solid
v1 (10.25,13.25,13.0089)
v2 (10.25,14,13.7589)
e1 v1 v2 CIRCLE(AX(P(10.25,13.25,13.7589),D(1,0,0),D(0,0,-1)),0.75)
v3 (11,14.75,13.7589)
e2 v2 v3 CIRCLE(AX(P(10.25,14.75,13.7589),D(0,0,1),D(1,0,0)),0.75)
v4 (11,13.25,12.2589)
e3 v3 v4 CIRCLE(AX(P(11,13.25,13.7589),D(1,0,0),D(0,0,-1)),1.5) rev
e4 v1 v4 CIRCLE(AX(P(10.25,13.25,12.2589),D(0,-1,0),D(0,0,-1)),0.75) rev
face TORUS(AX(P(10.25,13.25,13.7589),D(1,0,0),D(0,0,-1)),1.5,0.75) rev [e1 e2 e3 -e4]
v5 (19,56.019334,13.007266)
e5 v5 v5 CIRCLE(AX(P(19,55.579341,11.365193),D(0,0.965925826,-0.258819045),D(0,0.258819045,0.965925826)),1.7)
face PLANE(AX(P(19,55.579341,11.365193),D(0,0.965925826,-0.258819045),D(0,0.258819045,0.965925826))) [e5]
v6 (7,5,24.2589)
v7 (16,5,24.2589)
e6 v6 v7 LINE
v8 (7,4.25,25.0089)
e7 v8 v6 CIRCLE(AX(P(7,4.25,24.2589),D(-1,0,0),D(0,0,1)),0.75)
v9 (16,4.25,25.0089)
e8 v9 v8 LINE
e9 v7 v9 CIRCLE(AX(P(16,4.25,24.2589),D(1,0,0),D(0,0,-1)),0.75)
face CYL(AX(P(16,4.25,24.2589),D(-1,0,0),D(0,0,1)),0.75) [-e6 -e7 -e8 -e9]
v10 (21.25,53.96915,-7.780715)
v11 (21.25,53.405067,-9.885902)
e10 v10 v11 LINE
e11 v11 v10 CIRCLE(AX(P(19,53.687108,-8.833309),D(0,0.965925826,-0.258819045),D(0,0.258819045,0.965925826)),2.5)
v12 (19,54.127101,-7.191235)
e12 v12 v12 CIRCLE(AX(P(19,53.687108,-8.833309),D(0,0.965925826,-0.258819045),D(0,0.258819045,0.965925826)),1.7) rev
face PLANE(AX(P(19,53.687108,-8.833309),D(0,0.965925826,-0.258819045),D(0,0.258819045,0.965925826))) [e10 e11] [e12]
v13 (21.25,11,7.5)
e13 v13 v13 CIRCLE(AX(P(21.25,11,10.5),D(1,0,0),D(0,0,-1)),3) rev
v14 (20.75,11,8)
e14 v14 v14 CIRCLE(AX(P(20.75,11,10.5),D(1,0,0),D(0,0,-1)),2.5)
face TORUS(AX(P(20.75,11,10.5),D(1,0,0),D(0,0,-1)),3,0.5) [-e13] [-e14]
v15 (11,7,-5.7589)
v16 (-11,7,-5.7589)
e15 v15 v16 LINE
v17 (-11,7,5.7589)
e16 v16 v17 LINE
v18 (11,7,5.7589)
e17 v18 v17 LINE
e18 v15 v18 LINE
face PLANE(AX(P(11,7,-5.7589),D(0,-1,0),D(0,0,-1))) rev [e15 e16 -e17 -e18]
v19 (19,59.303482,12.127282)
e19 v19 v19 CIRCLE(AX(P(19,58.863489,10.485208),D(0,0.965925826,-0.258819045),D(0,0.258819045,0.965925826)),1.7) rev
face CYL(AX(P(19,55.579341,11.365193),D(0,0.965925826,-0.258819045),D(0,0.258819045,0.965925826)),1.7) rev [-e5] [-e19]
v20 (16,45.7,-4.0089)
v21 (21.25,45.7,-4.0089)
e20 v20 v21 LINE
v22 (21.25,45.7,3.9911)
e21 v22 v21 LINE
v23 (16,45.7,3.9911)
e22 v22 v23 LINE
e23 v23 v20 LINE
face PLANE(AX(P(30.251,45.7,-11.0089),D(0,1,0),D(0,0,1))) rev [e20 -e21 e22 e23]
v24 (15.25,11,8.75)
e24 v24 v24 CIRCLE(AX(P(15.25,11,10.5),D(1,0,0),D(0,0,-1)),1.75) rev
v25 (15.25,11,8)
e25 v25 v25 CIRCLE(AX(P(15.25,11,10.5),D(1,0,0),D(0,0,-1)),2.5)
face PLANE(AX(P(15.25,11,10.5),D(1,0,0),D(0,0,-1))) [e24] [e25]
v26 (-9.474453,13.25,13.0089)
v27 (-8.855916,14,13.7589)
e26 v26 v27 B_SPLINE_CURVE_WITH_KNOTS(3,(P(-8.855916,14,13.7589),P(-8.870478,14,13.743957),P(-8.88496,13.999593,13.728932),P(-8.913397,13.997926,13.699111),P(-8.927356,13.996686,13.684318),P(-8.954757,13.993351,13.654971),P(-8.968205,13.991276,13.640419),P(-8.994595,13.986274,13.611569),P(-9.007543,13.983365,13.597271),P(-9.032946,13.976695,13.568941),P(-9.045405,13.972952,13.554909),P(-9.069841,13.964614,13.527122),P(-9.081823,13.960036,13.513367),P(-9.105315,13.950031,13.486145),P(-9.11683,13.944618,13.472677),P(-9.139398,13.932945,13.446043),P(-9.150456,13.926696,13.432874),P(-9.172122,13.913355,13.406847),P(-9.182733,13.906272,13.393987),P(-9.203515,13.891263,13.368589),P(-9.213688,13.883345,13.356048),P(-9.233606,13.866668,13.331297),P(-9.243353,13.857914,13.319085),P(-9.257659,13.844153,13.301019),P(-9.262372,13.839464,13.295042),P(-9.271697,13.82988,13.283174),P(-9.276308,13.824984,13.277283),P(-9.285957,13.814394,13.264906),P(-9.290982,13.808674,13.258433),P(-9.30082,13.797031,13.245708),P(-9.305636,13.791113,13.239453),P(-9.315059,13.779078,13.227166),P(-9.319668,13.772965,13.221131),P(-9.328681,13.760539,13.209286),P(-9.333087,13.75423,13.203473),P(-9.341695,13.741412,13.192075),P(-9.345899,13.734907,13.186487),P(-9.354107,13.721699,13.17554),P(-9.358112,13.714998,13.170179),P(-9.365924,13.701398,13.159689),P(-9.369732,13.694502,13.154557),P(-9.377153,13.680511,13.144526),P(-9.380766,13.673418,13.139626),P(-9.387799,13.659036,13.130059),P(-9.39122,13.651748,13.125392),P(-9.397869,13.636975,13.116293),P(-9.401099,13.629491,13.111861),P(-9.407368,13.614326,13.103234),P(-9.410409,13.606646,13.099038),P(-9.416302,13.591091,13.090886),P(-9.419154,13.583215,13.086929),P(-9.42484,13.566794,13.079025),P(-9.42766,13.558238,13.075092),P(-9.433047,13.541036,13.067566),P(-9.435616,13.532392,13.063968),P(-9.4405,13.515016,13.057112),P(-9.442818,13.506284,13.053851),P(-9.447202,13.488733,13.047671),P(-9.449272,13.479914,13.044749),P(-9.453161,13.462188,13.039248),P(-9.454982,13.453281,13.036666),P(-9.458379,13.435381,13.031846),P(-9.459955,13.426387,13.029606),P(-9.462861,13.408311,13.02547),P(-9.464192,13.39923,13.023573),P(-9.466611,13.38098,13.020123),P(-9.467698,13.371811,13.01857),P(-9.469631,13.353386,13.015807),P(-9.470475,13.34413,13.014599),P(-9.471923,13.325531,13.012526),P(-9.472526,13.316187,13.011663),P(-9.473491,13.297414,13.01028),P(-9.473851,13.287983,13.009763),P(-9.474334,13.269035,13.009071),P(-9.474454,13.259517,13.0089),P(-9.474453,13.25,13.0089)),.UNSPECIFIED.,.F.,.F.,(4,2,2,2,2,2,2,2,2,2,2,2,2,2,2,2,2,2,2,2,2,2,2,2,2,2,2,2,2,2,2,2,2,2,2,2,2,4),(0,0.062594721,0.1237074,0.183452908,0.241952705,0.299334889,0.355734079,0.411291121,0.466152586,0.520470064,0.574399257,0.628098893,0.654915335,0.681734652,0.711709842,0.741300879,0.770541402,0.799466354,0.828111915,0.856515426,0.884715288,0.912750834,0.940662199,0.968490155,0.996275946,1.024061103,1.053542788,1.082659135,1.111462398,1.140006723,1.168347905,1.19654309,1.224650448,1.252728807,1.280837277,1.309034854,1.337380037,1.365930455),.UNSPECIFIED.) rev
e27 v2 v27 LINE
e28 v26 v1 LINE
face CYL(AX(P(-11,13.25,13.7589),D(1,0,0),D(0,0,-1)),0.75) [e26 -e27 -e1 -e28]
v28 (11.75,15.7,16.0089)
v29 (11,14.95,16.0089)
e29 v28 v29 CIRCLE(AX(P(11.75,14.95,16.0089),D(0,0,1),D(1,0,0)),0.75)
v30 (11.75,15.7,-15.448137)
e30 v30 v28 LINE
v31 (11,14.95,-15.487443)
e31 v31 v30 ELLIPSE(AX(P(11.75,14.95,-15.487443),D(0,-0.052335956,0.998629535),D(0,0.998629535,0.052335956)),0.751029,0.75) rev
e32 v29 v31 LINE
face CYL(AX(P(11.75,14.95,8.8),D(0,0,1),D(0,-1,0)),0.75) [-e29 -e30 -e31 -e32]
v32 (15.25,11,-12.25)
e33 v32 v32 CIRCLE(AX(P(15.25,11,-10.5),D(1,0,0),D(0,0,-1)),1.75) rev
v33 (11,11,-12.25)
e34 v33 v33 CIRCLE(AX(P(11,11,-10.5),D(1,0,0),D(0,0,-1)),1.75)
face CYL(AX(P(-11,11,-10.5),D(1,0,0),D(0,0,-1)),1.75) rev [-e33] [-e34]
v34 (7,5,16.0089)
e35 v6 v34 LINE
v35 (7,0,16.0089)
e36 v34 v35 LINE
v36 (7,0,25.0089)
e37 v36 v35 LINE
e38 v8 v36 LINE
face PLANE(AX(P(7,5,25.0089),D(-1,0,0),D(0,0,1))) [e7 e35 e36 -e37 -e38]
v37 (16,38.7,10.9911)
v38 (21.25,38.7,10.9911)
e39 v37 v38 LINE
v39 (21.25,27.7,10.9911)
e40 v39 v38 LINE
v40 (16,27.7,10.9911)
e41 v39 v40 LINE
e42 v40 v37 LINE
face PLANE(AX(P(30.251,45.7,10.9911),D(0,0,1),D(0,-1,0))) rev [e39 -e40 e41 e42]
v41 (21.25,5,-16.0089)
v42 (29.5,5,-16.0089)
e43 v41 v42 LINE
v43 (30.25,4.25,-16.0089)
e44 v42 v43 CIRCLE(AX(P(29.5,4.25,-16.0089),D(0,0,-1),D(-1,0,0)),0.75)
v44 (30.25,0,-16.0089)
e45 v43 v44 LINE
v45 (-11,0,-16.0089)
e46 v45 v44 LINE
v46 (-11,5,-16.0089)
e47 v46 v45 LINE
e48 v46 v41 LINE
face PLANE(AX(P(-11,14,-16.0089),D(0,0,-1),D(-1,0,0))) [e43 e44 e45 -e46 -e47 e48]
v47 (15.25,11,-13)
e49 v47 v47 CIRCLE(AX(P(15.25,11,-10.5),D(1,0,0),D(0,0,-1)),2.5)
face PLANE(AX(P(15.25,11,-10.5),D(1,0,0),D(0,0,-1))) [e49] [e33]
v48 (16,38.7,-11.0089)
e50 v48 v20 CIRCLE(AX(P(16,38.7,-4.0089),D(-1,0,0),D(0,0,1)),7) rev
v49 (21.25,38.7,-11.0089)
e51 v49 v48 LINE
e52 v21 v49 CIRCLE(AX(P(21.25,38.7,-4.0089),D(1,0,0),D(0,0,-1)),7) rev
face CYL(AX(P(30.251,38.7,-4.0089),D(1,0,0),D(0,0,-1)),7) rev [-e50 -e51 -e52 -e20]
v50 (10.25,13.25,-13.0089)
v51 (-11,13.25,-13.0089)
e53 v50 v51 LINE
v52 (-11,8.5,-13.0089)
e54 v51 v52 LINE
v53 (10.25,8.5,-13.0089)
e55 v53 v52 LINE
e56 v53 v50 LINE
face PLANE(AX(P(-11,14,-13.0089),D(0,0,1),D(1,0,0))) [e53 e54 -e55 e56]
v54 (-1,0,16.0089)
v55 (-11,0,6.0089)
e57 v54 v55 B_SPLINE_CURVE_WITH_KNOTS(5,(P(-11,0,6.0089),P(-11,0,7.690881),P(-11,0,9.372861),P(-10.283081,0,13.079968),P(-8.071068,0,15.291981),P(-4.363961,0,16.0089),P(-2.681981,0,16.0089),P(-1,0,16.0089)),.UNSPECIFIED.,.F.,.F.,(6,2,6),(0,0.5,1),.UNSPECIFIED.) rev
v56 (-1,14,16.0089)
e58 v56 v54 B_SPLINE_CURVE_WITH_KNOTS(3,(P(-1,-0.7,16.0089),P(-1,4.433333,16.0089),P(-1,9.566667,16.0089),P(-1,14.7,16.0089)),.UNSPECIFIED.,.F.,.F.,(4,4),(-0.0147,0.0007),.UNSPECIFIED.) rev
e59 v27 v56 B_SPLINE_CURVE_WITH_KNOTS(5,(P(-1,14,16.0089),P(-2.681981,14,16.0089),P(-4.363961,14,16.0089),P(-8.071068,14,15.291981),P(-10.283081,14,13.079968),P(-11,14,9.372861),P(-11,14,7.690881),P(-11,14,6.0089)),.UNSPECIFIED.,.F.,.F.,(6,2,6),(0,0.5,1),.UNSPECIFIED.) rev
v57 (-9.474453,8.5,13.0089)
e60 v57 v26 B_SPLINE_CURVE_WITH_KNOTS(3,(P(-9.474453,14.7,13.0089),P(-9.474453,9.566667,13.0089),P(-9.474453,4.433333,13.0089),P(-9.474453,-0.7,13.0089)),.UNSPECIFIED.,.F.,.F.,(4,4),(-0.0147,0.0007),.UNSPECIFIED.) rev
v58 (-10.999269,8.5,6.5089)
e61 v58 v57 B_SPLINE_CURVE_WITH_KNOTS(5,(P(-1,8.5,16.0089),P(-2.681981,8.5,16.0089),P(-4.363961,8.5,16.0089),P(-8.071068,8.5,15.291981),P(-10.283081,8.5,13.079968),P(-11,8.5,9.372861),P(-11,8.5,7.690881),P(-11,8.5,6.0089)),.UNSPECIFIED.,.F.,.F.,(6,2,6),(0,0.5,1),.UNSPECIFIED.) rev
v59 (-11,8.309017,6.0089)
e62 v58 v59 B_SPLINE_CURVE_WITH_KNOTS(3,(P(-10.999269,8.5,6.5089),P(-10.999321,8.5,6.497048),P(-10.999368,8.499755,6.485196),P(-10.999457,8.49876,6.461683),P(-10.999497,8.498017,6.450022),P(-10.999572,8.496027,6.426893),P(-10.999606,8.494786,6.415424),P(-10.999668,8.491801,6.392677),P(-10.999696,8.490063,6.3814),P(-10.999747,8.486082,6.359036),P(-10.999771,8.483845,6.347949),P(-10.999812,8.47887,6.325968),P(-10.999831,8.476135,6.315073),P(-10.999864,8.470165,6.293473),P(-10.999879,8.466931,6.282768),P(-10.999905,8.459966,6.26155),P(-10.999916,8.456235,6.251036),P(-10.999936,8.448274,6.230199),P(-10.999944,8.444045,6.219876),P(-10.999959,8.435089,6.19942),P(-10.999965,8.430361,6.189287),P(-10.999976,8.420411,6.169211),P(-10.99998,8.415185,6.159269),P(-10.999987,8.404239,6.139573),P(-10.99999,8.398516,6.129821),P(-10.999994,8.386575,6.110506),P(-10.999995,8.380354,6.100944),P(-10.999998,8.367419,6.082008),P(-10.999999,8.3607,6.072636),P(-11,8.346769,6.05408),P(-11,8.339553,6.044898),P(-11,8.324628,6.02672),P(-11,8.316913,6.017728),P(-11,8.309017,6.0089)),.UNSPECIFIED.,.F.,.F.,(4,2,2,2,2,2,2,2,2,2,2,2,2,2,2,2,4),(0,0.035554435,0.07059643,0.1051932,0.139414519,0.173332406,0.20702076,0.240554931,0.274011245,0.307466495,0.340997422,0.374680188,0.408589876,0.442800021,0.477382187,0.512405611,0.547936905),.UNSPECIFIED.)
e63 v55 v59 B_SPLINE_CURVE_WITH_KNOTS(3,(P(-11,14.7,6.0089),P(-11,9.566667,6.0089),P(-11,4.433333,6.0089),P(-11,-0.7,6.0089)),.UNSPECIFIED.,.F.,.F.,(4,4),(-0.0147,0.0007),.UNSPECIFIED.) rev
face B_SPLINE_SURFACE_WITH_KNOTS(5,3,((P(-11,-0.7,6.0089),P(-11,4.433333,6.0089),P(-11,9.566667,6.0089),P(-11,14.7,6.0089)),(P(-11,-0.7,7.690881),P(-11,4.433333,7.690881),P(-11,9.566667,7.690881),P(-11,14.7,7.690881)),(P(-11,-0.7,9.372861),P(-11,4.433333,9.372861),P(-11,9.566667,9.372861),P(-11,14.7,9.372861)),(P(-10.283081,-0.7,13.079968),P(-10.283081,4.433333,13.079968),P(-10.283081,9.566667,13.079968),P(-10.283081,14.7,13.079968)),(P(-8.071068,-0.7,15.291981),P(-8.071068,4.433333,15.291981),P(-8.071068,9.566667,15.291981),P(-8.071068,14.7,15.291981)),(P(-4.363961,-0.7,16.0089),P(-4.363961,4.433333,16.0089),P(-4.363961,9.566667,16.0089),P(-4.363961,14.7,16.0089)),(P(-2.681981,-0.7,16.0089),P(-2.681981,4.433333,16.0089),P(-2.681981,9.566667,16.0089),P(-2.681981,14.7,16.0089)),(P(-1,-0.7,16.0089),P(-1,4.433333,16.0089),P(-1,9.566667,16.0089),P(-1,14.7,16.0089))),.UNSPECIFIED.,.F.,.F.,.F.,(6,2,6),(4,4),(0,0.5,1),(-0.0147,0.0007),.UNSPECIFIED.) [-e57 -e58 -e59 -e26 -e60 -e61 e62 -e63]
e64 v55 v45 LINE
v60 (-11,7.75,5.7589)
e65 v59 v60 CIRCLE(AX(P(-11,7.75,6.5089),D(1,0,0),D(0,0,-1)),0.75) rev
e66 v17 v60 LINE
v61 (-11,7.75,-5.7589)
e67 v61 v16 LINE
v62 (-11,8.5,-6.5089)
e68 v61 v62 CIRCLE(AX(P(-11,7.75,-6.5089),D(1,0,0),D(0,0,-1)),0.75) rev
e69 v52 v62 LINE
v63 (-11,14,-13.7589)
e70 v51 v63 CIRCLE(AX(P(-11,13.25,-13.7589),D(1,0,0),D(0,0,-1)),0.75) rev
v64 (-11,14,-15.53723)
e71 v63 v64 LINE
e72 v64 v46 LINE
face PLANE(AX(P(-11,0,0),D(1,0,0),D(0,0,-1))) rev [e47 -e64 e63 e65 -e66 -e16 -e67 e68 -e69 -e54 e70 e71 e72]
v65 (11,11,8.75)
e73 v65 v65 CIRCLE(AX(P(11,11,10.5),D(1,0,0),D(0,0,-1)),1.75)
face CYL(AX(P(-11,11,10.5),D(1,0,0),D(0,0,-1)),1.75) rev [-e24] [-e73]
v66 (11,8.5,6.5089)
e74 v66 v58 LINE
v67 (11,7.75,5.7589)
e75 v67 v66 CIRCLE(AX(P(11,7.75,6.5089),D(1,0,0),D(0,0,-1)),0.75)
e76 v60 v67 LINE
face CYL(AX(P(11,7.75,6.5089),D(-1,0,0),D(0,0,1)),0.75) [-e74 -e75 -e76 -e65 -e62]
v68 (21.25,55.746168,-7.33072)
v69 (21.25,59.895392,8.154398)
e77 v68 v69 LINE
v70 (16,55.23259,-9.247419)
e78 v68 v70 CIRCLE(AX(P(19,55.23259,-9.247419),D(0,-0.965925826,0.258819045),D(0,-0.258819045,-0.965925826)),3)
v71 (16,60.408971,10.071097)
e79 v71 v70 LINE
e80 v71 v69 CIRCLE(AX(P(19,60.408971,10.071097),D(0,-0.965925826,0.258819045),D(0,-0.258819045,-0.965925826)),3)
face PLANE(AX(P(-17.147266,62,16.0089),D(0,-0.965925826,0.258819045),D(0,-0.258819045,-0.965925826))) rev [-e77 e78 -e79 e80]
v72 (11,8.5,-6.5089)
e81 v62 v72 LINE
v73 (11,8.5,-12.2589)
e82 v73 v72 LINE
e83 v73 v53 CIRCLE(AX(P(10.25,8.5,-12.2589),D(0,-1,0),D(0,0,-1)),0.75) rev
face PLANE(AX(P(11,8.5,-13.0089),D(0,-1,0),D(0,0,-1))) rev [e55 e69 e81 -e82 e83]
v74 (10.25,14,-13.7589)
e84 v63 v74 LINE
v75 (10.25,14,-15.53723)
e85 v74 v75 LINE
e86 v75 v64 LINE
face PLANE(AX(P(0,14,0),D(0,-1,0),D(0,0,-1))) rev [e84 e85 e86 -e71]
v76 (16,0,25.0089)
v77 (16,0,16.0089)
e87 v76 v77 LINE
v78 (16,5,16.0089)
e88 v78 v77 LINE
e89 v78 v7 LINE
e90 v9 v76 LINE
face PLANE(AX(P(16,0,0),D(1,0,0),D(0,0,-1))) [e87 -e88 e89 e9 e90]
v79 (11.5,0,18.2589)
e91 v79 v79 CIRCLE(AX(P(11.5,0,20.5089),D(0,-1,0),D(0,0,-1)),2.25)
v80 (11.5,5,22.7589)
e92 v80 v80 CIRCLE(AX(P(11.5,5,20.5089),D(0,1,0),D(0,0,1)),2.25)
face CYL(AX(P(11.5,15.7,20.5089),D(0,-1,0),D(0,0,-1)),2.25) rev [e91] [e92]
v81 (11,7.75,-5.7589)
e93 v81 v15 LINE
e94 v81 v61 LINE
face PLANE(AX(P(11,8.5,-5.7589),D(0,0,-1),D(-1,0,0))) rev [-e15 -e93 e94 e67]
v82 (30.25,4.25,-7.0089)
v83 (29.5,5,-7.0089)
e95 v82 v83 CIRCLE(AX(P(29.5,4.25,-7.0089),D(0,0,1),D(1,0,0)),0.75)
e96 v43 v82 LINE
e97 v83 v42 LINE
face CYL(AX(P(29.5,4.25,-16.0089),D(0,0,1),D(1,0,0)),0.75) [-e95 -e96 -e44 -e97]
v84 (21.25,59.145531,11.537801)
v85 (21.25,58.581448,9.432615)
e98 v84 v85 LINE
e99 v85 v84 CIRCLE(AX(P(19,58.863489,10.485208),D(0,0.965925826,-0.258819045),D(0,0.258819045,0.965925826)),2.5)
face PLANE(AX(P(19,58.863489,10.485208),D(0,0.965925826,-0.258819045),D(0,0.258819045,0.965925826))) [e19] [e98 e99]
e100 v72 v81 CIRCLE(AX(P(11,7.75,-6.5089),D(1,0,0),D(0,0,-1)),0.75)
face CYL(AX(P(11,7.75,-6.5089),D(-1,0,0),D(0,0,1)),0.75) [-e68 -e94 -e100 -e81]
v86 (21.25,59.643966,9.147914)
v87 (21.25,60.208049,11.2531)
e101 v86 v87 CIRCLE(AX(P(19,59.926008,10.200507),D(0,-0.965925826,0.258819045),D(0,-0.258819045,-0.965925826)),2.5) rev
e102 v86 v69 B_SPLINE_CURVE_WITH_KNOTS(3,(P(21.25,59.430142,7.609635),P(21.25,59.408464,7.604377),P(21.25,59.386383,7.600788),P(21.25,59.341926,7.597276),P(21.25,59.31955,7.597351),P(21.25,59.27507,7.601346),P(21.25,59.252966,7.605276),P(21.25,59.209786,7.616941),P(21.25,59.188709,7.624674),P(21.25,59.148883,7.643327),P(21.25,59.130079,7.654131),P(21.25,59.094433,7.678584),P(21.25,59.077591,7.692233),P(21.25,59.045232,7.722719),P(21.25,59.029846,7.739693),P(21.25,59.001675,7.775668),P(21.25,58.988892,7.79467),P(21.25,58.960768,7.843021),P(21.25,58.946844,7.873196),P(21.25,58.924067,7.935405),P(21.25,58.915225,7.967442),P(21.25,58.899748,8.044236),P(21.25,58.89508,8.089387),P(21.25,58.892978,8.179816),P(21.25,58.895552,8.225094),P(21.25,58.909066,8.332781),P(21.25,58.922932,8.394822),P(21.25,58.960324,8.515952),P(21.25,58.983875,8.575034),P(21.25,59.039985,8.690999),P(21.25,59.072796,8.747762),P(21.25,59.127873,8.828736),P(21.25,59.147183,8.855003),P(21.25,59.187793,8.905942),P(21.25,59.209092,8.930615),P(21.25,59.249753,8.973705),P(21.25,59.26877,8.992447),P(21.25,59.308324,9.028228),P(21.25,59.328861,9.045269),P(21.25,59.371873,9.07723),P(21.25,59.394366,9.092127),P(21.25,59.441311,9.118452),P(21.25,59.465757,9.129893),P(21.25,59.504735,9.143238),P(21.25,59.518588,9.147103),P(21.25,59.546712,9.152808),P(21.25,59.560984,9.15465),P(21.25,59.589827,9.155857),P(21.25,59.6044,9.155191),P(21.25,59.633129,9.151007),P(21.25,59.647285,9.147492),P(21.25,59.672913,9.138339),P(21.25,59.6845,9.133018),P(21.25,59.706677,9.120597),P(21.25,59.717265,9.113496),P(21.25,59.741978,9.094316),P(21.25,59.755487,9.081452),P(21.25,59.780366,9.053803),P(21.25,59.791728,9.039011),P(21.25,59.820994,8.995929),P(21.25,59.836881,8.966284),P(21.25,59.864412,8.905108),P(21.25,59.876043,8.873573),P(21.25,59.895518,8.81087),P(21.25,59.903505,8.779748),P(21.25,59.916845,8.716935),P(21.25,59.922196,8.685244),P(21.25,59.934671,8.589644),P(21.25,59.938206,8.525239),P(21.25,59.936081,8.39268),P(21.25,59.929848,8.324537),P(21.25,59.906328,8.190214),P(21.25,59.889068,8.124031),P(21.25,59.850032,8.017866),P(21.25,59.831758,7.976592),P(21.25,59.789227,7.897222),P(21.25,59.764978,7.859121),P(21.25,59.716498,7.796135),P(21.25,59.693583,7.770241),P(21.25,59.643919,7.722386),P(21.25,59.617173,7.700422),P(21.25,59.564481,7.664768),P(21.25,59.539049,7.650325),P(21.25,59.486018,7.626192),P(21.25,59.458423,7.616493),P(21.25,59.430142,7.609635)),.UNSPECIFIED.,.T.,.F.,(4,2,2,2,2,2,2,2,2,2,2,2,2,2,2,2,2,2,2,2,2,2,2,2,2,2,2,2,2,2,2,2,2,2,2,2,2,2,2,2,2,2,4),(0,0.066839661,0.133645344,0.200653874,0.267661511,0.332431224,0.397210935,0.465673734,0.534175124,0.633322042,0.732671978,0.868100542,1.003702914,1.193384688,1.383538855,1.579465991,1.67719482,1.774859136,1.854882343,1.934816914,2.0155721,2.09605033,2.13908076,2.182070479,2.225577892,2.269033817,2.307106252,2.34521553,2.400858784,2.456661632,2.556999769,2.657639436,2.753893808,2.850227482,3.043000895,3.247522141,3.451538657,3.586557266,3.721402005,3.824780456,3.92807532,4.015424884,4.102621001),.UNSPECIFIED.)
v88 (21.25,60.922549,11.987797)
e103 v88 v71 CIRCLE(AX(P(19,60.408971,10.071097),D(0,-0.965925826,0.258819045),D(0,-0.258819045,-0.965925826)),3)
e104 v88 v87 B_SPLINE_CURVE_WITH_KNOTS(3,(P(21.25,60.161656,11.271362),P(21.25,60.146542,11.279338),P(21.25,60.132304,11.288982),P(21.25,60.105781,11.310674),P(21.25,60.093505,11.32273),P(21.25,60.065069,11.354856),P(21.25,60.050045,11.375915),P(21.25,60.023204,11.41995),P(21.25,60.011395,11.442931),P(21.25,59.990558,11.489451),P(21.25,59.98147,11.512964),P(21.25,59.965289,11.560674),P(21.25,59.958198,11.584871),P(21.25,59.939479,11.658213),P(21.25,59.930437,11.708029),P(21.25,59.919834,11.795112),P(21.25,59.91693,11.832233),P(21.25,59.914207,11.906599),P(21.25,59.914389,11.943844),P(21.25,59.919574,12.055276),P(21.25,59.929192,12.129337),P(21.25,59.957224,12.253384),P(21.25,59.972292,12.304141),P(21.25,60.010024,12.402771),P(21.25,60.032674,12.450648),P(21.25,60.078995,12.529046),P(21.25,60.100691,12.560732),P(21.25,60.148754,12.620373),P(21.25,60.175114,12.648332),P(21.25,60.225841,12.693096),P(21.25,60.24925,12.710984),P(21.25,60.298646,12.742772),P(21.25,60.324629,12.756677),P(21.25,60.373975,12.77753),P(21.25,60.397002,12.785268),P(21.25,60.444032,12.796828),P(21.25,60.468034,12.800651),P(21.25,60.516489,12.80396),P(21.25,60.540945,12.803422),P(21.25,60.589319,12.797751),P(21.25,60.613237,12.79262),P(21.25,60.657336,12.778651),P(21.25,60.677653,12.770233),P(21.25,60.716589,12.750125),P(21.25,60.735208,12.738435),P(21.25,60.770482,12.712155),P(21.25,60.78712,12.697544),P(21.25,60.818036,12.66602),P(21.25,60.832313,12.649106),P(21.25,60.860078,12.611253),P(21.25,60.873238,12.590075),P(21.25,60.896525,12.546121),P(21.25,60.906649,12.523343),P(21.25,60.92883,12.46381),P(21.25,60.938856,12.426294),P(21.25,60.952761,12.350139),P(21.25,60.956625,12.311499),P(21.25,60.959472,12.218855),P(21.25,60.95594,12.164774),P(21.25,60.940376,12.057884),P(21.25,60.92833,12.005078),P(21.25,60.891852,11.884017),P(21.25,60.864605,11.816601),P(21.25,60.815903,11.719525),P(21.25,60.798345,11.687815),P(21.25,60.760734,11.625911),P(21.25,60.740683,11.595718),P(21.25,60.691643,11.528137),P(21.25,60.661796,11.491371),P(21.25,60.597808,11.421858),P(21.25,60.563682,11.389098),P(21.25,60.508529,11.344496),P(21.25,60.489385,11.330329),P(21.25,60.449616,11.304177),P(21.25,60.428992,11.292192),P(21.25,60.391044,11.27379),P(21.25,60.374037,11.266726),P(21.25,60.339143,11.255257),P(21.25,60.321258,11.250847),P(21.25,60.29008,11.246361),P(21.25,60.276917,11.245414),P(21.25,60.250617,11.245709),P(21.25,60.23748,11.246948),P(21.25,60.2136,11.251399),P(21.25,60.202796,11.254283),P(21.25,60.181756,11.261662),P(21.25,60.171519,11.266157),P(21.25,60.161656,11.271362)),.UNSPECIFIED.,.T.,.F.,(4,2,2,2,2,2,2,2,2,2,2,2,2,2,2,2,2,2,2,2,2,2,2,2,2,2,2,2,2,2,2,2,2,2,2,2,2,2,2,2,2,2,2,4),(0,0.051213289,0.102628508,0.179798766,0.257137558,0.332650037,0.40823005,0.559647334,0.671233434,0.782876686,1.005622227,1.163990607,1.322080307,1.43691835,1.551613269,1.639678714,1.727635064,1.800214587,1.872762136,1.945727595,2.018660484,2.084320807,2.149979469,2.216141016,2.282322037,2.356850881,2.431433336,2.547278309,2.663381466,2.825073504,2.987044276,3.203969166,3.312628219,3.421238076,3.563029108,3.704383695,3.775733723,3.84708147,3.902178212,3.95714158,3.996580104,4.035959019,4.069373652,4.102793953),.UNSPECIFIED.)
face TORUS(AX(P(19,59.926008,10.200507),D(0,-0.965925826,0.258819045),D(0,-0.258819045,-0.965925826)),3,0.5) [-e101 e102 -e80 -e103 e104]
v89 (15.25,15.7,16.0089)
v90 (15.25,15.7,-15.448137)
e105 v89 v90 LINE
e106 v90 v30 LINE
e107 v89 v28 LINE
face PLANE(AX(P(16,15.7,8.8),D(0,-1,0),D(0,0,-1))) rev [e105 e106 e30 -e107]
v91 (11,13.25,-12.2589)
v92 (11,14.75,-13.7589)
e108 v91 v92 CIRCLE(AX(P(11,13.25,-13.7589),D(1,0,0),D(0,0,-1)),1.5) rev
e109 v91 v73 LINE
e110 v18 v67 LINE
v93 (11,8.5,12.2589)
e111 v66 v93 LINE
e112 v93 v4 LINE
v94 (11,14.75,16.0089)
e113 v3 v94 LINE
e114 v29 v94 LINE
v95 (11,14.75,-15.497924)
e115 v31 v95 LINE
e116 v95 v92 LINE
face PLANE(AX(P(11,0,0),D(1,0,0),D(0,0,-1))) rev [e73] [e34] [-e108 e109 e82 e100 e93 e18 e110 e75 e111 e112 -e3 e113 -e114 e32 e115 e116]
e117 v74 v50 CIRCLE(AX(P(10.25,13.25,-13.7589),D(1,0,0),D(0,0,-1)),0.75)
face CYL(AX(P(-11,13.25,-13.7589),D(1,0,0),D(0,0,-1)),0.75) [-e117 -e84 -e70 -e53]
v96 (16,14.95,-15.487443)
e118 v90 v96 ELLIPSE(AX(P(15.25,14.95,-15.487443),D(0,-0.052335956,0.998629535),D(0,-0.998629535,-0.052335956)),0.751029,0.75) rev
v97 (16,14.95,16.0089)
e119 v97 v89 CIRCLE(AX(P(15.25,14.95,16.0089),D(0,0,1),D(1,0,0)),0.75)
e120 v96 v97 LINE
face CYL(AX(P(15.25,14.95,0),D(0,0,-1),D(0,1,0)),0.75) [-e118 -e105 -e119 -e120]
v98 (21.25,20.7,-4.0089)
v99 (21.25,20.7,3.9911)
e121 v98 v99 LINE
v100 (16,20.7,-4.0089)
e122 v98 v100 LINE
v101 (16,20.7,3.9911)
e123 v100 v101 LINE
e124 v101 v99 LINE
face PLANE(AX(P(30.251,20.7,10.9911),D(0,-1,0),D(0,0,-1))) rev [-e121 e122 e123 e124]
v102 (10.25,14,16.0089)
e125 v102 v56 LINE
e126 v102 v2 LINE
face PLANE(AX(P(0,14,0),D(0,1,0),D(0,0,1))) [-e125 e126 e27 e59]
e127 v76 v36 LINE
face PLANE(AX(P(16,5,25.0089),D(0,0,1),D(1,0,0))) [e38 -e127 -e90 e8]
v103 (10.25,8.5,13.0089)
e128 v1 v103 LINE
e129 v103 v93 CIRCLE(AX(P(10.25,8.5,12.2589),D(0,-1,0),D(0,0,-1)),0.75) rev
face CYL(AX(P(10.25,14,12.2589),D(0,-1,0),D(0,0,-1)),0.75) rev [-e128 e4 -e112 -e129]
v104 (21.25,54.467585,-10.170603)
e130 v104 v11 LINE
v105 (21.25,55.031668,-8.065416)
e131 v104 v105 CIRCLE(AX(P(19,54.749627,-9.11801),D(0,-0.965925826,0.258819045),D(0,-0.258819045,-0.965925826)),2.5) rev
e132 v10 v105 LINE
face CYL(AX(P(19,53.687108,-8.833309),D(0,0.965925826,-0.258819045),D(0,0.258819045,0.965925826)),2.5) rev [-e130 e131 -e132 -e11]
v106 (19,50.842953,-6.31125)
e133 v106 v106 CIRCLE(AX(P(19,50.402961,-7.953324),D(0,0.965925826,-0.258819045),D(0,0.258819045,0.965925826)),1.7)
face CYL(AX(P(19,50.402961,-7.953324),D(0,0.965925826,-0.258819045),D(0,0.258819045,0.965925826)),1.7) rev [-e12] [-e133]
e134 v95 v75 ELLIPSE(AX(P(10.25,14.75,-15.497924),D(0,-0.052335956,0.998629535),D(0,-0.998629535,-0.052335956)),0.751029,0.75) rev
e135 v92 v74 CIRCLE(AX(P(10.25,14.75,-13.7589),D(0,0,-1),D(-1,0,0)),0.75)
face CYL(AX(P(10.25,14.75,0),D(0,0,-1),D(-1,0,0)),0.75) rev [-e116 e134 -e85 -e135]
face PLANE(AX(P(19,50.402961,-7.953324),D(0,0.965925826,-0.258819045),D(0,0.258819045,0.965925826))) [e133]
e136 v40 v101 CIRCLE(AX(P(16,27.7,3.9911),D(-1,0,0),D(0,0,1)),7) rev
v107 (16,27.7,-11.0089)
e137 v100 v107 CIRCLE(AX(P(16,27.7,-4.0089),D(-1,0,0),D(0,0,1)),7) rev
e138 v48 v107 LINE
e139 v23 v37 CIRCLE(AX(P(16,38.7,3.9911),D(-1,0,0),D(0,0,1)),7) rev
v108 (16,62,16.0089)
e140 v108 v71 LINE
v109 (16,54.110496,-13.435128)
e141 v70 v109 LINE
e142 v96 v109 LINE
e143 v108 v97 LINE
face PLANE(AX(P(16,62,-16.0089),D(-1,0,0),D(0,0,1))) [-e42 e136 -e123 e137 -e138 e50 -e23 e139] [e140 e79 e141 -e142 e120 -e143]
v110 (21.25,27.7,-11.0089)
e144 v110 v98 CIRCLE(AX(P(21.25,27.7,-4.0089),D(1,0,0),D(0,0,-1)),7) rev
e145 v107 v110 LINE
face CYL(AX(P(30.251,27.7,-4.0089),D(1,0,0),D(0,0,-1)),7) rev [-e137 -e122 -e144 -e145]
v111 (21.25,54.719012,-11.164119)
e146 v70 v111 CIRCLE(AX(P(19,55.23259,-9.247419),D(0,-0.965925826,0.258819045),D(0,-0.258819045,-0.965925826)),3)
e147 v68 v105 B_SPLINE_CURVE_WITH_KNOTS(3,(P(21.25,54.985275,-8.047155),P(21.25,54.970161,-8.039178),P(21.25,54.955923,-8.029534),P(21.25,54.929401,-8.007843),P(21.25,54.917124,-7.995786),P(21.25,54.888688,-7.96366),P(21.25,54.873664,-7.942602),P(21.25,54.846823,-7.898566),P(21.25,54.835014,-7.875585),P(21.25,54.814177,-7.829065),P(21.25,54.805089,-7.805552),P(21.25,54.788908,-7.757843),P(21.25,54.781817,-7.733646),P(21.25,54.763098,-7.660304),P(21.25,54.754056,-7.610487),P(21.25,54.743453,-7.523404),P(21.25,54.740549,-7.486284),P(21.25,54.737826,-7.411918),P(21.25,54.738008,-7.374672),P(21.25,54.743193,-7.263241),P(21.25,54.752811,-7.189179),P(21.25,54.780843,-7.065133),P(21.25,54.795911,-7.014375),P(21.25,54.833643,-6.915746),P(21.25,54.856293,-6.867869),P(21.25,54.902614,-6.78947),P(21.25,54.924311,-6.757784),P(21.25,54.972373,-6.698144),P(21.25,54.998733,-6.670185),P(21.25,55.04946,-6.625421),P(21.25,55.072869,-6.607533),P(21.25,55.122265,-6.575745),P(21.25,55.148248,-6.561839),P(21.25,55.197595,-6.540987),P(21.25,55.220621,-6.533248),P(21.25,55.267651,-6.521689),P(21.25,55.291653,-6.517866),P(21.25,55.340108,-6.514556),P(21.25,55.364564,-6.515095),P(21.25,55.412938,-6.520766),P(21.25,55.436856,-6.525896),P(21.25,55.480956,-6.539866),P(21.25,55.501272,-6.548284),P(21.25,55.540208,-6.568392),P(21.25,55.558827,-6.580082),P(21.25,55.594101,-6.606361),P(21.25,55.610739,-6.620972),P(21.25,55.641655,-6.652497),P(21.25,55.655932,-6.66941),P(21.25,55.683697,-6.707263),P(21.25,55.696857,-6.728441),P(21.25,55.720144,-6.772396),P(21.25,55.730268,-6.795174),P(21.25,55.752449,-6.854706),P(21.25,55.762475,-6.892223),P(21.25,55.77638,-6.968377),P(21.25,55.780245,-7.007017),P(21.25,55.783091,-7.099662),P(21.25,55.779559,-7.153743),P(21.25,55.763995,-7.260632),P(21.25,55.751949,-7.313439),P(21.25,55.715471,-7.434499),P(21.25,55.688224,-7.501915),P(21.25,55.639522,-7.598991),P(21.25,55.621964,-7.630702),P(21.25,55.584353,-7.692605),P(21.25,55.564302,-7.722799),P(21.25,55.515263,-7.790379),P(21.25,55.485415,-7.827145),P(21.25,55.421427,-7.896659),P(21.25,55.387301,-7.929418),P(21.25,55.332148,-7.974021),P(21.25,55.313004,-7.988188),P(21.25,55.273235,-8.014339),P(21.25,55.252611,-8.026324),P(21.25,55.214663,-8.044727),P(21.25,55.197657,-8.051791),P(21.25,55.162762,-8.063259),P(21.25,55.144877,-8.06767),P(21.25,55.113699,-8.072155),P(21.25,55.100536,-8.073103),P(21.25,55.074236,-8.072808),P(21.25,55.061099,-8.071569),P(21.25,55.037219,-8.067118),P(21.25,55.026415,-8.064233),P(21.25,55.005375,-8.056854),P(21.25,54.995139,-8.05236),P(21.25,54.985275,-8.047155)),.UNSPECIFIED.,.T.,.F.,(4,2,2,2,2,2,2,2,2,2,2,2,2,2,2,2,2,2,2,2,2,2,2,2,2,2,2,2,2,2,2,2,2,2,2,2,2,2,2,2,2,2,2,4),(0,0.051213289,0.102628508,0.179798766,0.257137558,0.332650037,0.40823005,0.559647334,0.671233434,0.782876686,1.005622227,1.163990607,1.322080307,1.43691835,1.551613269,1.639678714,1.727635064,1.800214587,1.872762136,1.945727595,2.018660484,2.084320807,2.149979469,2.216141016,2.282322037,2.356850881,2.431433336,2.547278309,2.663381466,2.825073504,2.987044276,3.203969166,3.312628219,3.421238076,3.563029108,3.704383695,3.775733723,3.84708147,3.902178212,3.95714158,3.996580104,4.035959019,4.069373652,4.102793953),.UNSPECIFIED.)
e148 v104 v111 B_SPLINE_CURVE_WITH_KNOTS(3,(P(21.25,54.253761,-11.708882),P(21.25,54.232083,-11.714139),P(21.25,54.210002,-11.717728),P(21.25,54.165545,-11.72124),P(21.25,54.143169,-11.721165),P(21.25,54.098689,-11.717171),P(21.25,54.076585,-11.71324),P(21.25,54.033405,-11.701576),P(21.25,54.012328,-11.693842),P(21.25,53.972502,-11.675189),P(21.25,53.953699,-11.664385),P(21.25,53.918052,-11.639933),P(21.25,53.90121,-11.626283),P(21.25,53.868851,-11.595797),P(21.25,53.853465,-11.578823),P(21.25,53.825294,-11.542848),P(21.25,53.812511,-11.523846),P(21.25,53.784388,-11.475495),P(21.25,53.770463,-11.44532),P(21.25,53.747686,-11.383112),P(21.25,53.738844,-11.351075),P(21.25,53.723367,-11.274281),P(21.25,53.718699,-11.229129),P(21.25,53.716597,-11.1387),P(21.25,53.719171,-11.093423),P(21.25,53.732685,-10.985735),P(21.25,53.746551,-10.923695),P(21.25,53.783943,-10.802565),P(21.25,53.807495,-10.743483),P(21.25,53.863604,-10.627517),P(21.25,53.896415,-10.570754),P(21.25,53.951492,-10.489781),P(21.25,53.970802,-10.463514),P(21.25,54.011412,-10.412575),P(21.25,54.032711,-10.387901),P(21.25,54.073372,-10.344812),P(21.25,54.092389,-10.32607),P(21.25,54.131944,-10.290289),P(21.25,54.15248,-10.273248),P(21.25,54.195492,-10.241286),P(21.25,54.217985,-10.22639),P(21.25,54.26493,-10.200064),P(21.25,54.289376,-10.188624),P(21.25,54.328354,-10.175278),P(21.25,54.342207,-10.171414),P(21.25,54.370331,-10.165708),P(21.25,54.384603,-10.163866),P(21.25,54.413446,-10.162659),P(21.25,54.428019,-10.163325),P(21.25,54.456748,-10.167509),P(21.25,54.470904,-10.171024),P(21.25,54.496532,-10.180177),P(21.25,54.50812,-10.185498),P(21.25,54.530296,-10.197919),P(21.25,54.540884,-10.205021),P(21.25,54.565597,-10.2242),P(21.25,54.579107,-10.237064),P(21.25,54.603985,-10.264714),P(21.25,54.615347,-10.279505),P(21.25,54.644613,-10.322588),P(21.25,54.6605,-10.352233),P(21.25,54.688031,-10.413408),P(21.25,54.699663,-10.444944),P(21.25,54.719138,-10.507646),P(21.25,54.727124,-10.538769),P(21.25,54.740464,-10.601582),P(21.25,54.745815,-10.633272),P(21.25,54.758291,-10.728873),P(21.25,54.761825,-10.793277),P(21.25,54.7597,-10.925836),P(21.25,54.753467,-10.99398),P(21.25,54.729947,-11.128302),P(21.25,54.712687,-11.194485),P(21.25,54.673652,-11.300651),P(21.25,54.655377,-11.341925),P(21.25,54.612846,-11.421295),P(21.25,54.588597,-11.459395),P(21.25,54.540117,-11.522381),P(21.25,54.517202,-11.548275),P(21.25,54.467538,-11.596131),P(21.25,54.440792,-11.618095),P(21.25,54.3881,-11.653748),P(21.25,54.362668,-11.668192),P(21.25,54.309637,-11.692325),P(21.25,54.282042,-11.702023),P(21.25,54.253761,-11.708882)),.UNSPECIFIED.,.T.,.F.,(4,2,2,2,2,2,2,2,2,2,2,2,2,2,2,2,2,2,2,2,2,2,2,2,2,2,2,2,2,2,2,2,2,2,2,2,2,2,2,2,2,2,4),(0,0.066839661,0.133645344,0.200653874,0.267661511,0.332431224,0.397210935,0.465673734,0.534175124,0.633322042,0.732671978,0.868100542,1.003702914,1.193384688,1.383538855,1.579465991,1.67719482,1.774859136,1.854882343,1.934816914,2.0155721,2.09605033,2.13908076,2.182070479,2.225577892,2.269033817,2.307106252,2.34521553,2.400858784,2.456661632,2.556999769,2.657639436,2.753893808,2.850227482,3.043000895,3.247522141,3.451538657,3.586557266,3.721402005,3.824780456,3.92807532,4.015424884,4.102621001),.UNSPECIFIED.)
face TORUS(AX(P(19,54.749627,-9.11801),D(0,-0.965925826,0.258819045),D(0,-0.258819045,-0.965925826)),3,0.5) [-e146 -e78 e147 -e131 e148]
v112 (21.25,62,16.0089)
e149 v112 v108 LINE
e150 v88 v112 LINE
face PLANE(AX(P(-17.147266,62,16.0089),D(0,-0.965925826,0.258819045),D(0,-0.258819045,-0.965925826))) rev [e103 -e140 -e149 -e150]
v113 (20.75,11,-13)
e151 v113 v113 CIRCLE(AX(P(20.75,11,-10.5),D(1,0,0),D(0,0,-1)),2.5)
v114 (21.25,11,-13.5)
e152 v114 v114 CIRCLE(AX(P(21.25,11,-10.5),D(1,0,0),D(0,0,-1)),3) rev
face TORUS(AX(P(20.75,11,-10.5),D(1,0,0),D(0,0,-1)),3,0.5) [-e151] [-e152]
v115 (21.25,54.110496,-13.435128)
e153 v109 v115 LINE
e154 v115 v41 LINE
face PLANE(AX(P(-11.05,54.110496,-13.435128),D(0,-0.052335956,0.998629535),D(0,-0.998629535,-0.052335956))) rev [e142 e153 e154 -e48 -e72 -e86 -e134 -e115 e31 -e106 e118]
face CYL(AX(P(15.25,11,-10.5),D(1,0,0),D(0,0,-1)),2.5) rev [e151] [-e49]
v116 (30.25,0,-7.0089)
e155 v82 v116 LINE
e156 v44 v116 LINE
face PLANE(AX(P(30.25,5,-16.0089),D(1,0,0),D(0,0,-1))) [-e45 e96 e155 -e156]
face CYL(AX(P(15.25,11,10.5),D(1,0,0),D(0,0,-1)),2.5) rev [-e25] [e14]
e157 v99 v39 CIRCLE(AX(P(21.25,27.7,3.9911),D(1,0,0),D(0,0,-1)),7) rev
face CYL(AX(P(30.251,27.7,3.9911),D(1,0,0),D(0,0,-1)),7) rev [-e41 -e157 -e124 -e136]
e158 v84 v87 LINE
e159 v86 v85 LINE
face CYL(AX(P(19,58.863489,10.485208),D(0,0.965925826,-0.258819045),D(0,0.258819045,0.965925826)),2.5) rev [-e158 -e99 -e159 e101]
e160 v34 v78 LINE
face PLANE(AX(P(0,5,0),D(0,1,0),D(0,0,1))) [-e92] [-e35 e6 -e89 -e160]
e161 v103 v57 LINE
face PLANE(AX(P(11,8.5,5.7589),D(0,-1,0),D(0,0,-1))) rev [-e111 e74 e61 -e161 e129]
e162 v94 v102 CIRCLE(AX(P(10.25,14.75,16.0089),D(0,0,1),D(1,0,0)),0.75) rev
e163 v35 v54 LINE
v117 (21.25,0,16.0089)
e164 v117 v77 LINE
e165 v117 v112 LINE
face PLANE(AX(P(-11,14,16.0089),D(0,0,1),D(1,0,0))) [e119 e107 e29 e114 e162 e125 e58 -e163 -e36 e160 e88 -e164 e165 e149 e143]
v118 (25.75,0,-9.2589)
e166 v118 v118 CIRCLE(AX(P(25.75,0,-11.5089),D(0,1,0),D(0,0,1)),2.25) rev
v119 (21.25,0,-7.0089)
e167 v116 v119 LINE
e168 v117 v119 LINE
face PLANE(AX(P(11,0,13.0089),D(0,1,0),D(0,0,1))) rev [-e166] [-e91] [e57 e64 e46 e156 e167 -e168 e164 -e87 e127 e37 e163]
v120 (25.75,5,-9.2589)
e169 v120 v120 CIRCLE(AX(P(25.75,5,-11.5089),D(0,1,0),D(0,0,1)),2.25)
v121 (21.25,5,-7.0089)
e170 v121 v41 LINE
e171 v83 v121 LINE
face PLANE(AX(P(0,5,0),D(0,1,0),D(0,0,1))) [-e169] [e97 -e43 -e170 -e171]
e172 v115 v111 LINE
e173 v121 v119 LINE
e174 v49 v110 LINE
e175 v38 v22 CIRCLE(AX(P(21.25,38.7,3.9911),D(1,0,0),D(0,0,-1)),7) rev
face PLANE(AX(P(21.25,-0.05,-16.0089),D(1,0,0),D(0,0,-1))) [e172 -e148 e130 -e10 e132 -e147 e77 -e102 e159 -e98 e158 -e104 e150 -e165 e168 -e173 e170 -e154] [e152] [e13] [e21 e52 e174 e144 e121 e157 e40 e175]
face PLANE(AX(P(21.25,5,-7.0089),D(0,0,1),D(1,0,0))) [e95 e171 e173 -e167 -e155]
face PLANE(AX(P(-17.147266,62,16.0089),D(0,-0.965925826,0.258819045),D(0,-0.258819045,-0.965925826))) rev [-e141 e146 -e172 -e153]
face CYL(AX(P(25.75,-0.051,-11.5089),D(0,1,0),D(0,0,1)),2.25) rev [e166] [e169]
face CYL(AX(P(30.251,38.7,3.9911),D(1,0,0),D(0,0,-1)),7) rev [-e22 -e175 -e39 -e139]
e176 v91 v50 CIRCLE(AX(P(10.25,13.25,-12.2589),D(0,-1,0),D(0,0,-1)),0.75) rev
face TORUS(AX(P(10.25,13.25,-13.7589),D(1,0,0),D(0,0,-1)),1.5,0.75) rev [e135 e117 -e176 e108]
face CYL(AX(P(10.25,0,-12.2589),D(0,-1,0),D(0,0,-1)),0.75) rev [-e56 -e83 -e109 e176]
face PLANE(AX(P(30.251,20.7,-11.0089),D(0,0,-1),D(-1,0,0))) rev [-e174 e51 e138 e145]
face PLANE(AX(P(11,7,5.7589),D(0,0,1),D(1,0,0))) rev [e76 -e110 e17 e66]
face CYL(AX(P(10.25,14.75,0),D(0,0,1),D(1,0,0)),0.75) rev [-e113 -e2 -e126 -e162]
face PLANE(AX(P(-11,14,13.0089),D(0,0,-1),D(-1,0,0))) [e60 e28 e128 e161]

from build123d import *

# Parameters (mm, degrees)
BOSS_EXTRUDE1_DEPTH = 11
SKETCH3_W           = 22
SKETCH3_H           = 3
BOSS_EXTRUDE2_DEPTH = 14
BOSS_EXTRUDE3_DEPTH = 5
SKETCH5_R           = 1.75
CUT_EXTRUDE1_DEPTH  = 36.096650541
SKETCH6_W           = 9
SKETCH6_H           = 9
BOSS_EXTRUDE4_DEPTH = 5
SKETCH10_R          = 2.25
CUT_EXTRUDE2_DEPTH  = 34.584744739
FILLET1_R           = 0.75
FILLET2_SIZE        = 10
SKETCH12_W          = 9
SKETCH12_H          = 32.0178
BOSS_EXTRUDE5_DEPTH = 62
CUT_EXTRUDE4_DEPTH  = 9
SKETCH14_R          = 2.5
CUT_EXTRUDE5_DEPTH  = 9.75
SKETCH15_R          = 1.7
CUT_EXTRUDE6_DEPTH  = 5
SKETCH16_R          = 2.5
CUT_EXTRUDE7_DEPTH  = 1.6
FILLET3_R           = 0.5
FILLET4_R           = 0.5
SKETCH17_W          = 3.75
SKETCH17_H          = 32.0178
CUT_EXTRUDE9_DEPTH  = 72.375381621
SKETCH18_W          = 9
SKETCH18_H          = 9
BOSS_EXTRUDE6_DEPTH = 5
CUT_EXTRUDE10_REACH = 71.206
SKETCH19_R          = 2.25
FILLET6_START       = -17
FILLET6_DEPTH       = 11
CUT_EXTRUDE11_REACH = 74.1
SKETCH20_W          = 22
SKETCH20_H          = 25
CUT_EXTRUDE12_DEPTH = 75.22605744
FILLET7_START       = 16
FILLET7_DEPTH       = 5.25


with BuildPart() as part:
    # Sketch1 → Boss-Extrude1 (new, symmetric)
    with BuildSketch(Plane(origin=(0, 0, 0), x_dir=(0, 0, -1), z_dir=(1, 0, 0))):
        Polygon((-13.0089, 0), (13.0089, 0), (13.0089, 8.5), (5.7589, 8.5), (5.7589, 7), (-5.7589, 7), (-5.7589, 8.5), (-13.0089, 8.5), align=None)
    extrude(amount=BOSS_EXTRUDE1_DEPTH, both=True)

    # Sketch3 → Boss-Extrude2 (add)
    with BuildSketch(Plane.XZ):
        with Locations((0, -14.5089)):
            Rectangle(SKETCH3_W, SKETCH3_H)
        with Locations((0, 14.5089)):
            Rectangle(SKETCH3_W, SKETCH3_H)
    extrude(amount=-BOSS_EXTRUDE2_DEPTH)

    # Sketch4 → Boss-Extrude3 (add)
    with BuildSketch(Plane(origin=(11, 0, 0), x_dir=(0, 0, -1), z_dir=(1, 0, 0))):
        Polygon((-8.8, 15.7), (-16.0089, 15.7), (-16.0089, 0), (16.0089, 0), (16.0089, 15.7), align=None)
    extrude(amount=BOSS_EXTRUDE3_DEPTH)

    # Sketch5 → Cut-Extrude1 (cut, through all)
    with BuildSketch(Plane(origin=(16, 0, 0), x_dir=(0, 0, -1), z_dir=(1, 0, 0))):
        with Locations((-10.5, 11)):
            Circle(SKETCH5_R)
        with Locations((10.5, 11)):
            Circle(SKETCH5_R)
    extrude(amount=-CUT_EXTRUDE1_DEPTH, mode=Mode.SUBTRACT)

    # Sketch6 → Boss-Extrude4 (add)
    with BuildSketch(Plane.XZ):
        with Locations((11.5, 20.5089)):
            Rectangle(SKETCH6_W, SKETCH6_H)
    extrude(amount=-BOSS_EXTRUDE4_DEPTH)

    # Sketch10 → Cut-Extrude2 (cut, through all)
    with BuildSketch(Plane.XZ):
        with Locations(Location((11.5, 20.5089, 0), (0, 0, 270))):
            Circle(SKETCH10_R)
    extrude(amount=-CUT_EXTRUDE2_DEPTH, mode=Mode.SUBTRACT)

    # Fillet1
    fillet1_edges = [part.edges().sort_by_distance(p)[0] for p in [
        (0, 8.5, 5.7589),
        (0, 8.5, -5.7589),
        (0, 14, -13.0089),
        (11, 14, -14.5089),
        (11, 11.25, -13.0089),
        (11, 14, 14.5089),
        (11, 11.25, 13.0089),
        (0, 14, 13.0089),
        (11, 15.7, 0),
        (16, 15.7, 0),
        (11.5, 5, 25.0089),
    ]]
    fillet(fillet1_edges, radius=FILLET1_R)

    # Fillet2
    # a fillet whose section is not a circle: 10 mm, written as the material it takes off along each edge
    with BuildSketch(Plane(origin=(-11, -25, 16.0089), x_dir=(0, 0, -1), z_dir=(0, 1, 0))) as fillet2_piece_1:
        with BuildLine():
            add(Edge.make_bspline([(FILLET2_SIZE, 0), (FILLET2_SIZE * 0.831801948466, 0), (FILLET2_SIZE * 0.663603896932, 0), (FILLET2_SIZE * 0.292893218813, -FILLET2_SIZE * 0.0716919198361), (FILLET2_SIZE * 0.0716919198361, -FILLET2_SIZE * 0.292893218813), (0, -FILLET2_SIZE * 0.663603896932), (0, -FILLET2_SIZE * 0.831801948466), (0, -FILLET2_SIZE)], knots=[0, 0, 0, 0, 0, 0, 0.5, 0.5, 1, 1, 1, 1, 1, 1], degree=5))
            Line((0, -FILLET2_SIZE), (0, 0))
            Line((0, 0), (FILLET2_SIZE, 0))
        make_face()
    extrude(amount=64, mode=Mode.SUBTRACT)

    # Sketch12 → Boss-Extrude5 (add)
    with BuildSketch(Plane.XZ):
        with Locations((20.5, 0)):
            Rectangle(SKETCH12_W, SKETCH12_H)
    extrude(amount=-BOSS_EXTRUDE5_DEPTH)

    # Sketch13 → Cut-Extrude4 (cut)
    with BuildSketch(Plane(origin=(25, 0, 0), x_dir=(0, 0, -1), z_dir=(1, 0, 0))):
        Polygon((16.0089, 62), (-16.0089, 62), (16.0089, 53.420856347), align=None)
    extrude(amount=-CUT_EXTRUDE4_DEPTH, mode=Mode.SUBTRACT)

    # Sketch14 → Cut-Extrude5 (cut)
    with BuildSketch(Plane(origin=(25, 0, 0), x_dir=(0, 0, -1), z_dir=(1, 0, 0))):
        with Locations((-10.5, 11)):
            Circle(SKETCH14_R)
        with Locations((10.5, 11)):
            Circle(SKETCH14_R)
    extrude(amount=-CUT_EXTRUDE5_DEPTH, mode=Mode.SUBTRACT)

    # Sketch15 → Cut-Extrude6 (cut)
    with BuildSketch(Plane(origin=(0, 53.844562517, -14.427607043), x_dir=(1, 0, 0), z_dir=(0, 0.9659258262890701, -0.25881904510251424))):
        with Locations(Location((19, -5.362925068, 0), (0, 0, 270))):
            Circle(SKETCH15_R)
        with Locations(Location((19, -25.362925068, 0), (0, 0, 270))):
            Circle(SKETCH15_R)
    extrude(amount=-CUT_EXTRUDE6_DEPTH, mode=Mode.SUBTRACT)

    # Sketch16 → Cut-Extrude7 (cut)
    with BuildSketch(Plane(origin=(0, 53.844562517, -14.427607043), x_dir=(1, 0, 0), z_dir=(0, 0.9659258262890701, -0.25881904510251424))):
        with Locations(Location((19, -5.362925068, 0), (0, 0, 270))):
            Circle(SKETCH16_R)
        with Locations(Location((19, -25.362925068, 0), (0, 0, 270))):
            Circle(SKETCH16_R)
    extrude(amount=-CUT_EXTRUDE7_DEPTH, mode=Mode.SUBTRACT)

    # Fillet3
    fillet3_edges = [part.edges().sort_by_distance(p)[0] for p in [
        (19, 54.58554205, -11.662233782),
        (19, 59.761922952, 7.656282744),
    ]]
    fillet(fillet3_edges, radius=FILLET3_R)

    # Fillet4
    fillet4_edges = [part.edges().sort_by_distance(p)[0] for p in [
        (25, 11, 13),
        (25, 11, -8),
    ]]
    fillet(fillet4_edges, radius=FILLET4_R)

    # Sketch17 → Cut-Extrude9 (cut, through all)
    with BuildSketch(Plane(origin=(0, 62, 0), x_dir=(-1, 0, 0), z_dir=(0, -1, 0))):
        with Locations((-23.125, 0)):
            Rectangle(SKETCH17_W, SKETCH17_H)
    extrude(amount=CUT_EXTRUDE9_DEPTH, mode=Mode.SUBTRACT)

    # Fillet5: read off the stored shape, not the designer's step
    # Fillet5 outline → Fillet5 (revolve, cut)
    with BuildSketch(Plane(origin=(0, 11, -10.5), x_dir=(0, 1, 0), z_dir=(0, 0, -1))):
        with BuildLine():
            ThreePointArc((2.5, 20.75), (2.646446609, 21.103553391), (3, 21.25))
            Line((3, 21.25), (2.5, 21.25))
            Line((2.5, 21.25), (2.5, 20.75))
        make_face()
    revolve(axis=Axis((0, 11, -10.5), (1, 0, 0)), mode=Mode.SUBTRACT)

    # Fillet5 2 outline → Fillet5 2 (revolve, cut)
    with BuildSketch(Plane(origin=(0, 11, 10.5), x_dir=(0, 1, 0), z_dir=(0, 0, -1))):
        with BuildLine():
            ThreePointArc((2.5, 20.75), (2.646446609, 21.103553391), (3, 21.25))
            Line((3, 21.25), (2.5, 21.25))
            Line((2.5, 21.25), (2.5, 20.75))
        make_face()
    revolve(axis=Axis((0, 11, 10.5), (1, 0, 0)), mode=Mode.SUBTRACT)

    # Sketch18 → Boss-Extrude6 (add)
    with BuildSketch(Plane.XZ):
        with Locations((25.75, -11.5089)):
            Rectangle(SKETCH18_W, SKETCH18_H)
    extrude(amount=-BOSS_EXTRUDE6_DEPTH)

    # Sketch19 → Cut-Extrude10 (cut, up to next)
    with BuildSketch(Plane(origin=(0, 5, 0), x_dir=(1, 0, 0), z_dir=(0, 1, 0)), mode=Mode.PRIVATE) as cut_extrude10_sk1:
        with Locations(Location((25.75, 11.5089, 0), (0, 0, 270))):
            Circle(SKETCH19_R)
    cut_extrude10_tool1 = extrude(cut_extrude10_sk1.sketch, amount=-CUT_EXTRUDE10_REACH, mode=Mode.PRIVATE) & part.part
    add(cut_extrude10_tool1.solids().sort_by_distance((25.75, 5, -11.5089))[0], mode=Mode.SUBTRACT)

    # Fillet6: read off the stored shape, not the designer's step
    # Fillet6 outline → Fillet6 (cut)
    with BuildSketch(Plane.XY.offset(FILLET6_START)):
        with BuildLine():
            ThreePointArc((29.5, 5), (30.030330086, 4.780330086), (30.25, 4.25))
            Line((30.25, 4.25), (30.25, 5))
            Line((30.25, 5), (29.5, 5))
        make_face()
    extrude(amount=FILLET6_DEPTH, mode=Mode.SUBTRACT)

    # Sketch20 → Cut-Extrude11 (cut, up to next)
    with BuildSketch(Plane.ZY.offset(-16), mode=Mode.PRIVATE) as cut_extrude11_sk1:
        with Locations((-0.0089, 33.2)):
            Rectangle(SKETCH20_W, SKETCH20_H)
    cut_extrude11_tool1 = extrude(cut_extrude11_sk1.sketch, amount=-CUT_EXTRUDE11_REACH, mode=Mode.PRIVATE) & part.part
    add(cut_extrude11_tool1.solids().sort_by_distance((16, 33.2, -0.0089))[0], mode=Mode.SUBTRACT)

    # Sketch21 → Cut-Extrude12 (cut, through all)
    with BuildSketch(Plane(origin=(21.25, 0, 0), x_dir=(0, 0, -1), z_dir=(1, 0, 0))):
        Polygon((16.0089, 5), (16.0089, 53.420856347), (13.435127939, 54.110496492), align=None)
    extrude(amount=-CUT_EXTRUDE12_DEPTH, mode=Mode.SUBTRACT)

    # Fillet7: read off the stored shape, not the designer's step
    # Fillet7 outline → Fillet7 (add)
    with BuildSketch(Plane.YZ.offset(FILLET7_START)):
        with BuildLine():
            ThreePointArc((27.7, -11.0089), (22.750252532, -8.958647468), (20.7, -4.0089))
            Line((20.7, -4.0089), (20.7, -11.0089))
            Line((20.7, -11.0089), (27.7, -11.0089))
        make_face()
        with BuildLine():
            Line((20.7, 10.9911), (20.7, 3.9911))
            ThreePointArc((20.7, 3.9911), (22.750252532, 8.940847468), (27.7, 10.9911))
            Line((27.7, 10.9911), (20.7, 10.9911))
        make_face()
        with BuildLine():
            ThreePointArc((45.7, -4.0089), (43.649747468, -8.958647468), (38.7, -11.0089))
            Line((38.7, -11.0089), (45.7, -11.0089))
            Line((45.7, -11.0089), (45.7, -4.0089))
        make_face()
        with BuildLine():
            Line((45.7, 10.9911), (38.7, 10.9911))
            ThreePointArc((38.7, 10.9911), (43.649747468, 8.940847468), (45.7, 3.9911))
            Line((45.7, 3.9911), (45.7, 10.9911))
        make_face()
    extrude(amount=FILLET7_DEPTH)


solid = part.part
